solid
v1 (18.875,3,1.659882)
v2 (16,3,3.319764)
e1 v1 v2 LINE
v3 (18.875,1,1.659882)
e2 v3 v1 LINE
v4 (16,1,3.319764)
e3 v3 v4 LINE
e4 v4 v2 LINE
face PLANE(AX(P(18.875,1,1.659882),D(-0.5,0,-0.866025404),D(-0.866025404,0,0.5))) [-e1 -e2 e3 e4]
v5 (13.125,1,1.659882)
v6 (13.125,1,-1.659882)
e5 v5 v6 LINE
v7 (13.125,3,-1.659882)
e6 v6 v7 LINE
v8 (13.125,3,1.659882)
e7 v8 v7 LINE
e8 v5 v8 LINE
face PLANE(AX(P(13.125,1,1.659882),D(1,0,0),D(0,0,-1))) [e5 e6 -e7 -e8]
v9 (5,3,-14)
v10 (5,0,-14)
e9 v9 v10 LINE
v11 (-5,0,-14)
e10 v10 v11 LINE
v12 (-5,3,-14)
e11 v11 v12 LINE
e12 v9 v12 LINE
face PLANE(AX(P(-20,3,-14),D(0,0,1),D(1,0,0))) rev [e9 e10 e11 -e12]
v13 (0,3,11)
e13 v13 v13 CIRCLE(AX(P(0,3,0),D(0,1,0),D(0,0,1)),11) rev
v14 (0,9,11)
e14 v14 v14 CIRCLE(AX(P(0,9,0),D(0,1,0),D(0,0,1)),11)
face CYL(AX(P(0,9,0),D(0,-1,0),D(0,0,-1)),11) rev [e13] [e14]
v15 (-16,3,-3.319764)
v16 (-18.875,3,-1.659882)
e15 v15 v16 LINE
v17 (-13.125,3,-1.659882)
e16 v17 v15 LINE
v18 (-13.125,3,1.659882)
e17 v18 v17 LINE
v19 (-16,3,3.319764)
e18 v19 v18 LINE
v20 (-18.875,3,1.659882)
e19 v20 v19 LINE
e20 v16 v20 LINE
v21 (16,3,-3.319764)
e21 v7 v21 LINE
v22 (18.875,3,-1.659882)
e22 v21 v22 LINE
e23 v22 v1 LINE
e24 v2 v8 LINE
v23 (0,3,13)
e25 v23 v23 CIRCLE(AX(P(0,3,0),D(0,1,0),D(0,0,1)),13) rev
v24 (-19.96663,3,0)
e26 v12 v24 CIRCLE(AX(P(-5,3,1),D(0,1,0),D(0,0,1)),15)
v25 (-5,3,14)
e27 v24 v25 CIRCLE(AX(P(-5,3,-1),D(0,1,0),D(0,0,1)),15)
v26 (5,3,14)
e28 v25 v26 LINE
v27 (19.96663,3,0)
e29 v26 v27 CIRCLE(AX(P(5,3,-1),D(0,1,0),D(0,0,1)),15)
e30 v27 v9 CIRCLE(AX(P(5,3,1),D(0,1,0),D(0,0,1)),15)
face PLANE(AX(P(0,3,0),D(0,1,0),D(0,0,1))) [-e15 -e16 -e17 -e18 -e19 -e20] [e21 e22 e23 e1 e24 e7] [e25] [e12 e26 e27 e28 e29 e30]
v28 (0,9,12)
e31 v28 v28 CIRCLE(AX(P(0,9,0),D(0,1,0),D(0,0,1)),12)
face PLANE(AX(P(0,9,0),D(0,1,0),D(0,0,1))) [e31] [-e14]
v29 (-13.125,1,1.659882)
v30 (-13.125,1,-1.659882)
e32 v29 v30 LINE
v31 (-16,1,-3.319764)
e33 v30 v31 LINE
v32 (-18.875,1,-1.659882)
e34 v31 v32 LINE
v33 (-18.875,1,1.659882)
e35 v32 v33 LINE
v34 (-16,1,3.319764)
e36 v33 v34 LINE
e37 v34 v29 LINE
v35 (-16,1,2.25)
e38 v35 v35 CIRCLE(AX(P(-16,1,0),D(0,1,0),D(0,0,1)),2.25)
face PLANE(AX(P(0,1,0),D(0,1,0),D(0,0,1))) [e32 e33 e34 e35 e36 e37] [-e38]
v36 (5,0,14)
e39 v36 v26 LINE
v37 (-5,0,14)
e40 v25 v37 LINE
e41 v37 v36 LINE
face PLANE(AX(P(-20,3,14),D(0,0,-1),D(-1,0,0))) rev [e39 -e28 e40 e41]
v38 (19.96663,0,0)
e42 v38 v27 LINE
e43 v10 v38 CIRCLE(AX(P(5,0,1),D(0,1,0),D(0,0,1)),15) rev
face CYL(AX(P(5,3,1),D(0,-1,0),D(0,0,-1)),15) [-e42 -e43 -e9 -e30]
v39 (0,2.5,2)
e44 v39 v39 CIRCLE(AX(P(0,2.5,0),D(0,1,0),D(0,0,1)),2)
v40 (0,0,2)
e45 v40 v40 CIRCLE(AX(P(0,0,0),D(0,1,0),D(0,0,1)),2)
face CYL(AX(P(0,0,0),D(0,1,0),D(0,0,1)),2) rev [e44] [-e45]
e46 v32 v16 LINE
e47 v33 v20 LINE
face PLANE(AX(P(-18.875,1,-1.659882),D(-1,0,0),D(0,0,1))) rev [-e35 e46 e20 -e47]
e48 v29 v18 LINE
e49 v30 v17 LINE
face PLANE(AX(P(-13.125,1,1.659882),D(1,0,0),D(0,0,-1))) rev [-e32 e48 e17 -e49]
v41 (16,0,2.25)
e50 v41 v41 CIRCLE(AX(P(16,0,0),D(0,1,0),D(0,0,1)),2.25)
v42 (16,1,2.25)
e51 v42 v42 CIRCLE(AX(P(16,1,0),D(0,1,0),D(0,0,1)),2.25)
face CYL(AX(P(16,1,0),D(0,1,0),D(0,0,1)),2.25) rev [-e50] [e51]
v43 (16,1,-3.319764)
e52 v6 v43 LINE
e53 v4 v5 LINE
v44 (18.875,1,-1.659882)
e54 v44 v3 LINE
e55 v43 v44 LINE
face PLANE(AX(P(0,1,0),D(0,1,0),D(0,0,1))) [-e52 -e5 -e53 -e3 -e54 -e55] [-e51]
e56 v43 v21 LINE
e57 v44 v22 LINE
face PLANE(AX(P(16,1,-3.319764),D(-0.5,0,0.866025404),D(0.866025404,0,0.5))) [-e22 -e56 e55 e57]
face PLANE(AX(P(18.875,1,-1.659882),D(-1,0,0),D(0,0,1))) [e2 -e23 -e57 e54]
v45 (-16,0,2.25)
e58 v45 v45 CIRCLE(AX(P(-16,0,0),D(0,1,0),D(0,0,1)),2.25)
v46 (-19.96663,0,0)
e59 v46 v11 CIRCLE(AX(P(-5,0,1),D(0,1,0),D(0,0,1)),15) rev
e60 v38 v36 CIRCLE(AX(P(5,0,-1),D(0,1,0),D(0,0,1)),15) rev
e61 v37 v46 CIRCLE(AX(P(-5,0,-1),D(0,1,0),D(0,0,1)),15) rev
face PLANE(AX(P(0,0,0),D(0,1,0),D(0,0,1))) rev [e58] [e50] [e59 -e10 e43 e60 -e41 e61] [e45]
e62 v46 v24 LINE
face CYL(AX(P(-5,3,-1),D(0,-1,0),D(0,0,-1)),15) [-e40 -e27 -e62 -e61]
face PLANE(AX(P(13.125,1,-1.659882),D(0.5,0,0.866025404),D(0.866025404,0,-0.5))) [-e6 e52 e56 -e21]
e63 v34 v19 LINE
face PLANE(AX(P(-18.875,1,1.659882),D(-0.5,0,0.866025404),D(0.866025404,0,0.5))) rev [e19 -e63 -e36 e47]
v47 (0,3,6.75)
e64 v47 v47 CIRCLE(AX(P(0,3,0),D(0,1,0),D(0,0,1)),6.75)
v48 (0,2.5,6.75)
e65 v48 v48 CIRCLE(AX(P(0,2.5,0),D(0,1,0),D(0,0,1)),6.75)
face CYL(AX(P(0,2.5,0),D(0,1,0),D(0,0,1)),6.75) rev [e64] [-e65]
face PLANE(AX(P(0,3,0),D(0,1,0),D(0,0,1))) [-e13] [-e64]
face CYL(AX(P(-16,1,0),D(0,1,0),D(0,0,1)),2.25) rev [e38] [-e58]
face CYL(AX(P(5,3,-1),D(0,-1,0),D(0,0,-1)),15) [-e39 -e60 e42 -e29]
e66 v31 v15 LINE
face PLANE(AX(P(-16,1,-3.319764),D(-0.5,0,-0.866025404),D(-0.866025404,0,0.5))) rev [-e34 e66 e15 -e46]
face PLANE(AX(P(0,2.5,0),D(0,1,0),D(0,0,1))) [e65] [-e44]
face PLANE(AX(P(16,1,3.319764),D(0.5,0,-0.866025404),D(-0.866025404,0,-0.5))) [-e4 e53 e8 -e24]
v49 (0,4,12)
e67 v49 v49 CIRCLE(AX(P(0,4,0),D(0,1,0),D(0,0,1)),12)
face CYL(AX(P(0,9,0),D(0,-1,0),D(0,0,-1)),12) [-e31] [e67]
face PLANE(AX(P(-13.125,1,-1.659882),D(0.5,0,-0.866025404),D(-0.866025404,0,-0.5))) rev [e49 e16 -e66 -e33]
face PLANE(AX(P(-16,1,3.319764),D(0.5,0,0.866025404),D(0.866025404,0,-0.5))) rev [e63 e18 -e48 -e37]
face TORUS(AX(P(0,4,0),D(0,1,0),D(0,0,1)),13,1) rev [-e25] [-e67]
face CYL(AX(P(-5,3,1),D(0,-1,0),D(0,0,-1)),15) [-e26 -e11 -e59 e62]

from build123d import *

# Parameters (mm, degrees)
SKETCH2_W           = 40
SKETCH2_H           = 28
BOSS_EXTRUDE1_DEPTH = 3
SKETCH3_R           = 12
SKETCH3_R_2         = 11
BOSS_EXTRUDE2_DEPTH = 6
CUT_EXTRUDE1_DEPTH  = 2
FILLET1_R           = 1
FILLET2_R           = 15
SKETCH8_R           = 6.75
CUT_EXTRUDE2_DEPTH  = 0.5
SKETCH9_R           = 2
CUT_EXTRUDE3_DEPTH  = 26.237200627


with BuildPart() as part:
    # Sketch2 → Boss-Extrude1 (new body)
    with BuildSketch(Plane(origin=(0, 0, 0), x_dir=(1, 0, 0), z_dir=(0, 1, 0))):
        Rectangle(SKETCH2_W, SKETCH2_H)
    extrude(amount=BOSS_EXTRUDE1_DEPTH)

    # Sketch3 → Boss-Extrude2 (add)
    with BuildSketch(Plane(origin=(0, 3, 0), x_dir=(1, 0, 0), z_dir=(0, 1, 0))):
        with Locations(Location((0, 0, 0), (0, 0, 270))):
            Circle(SKETCH3_R)
        with Locations(Location((0, 0, 0), (0, 0, 270))):
            Circle(SKETCH3_R_2, mode=Mode.SUBTRACT)
    extrude(amount=BOSS_EXTRUDE2_DEPTH)

    # Sketch4 → Cut-Extrude1 (cut)
    with BuildSketch(Plane(origin=(0, 3, 0), x_dir=(1, 0, 0), z_dir=(0, 1, 0))):
        Polygon((-16, 3.319764048), (-18.875, 1.659882024), (-18.875, -1.659882024), (-16, -3.319764048), (-13.125, -1.659882024), (-13.125, 1.659882024), align=None)
    cut_extrude1 = extrude(amount=-CUT_EXTRUDE1_DEPTH, mode=Mode.SUBTRACT)

    # Sketch6 → M4 Clearance Hole1 (revolve, cut)
    with BuildSketch(Plane(origin=(-16, 1, 0), x_dir=(0, 0, 1), z_dir=(1, 0, 0))):
        Polygon((0, 0), (0, 3.351936393), (2.25, 2), (2.25, 0), align=None)
    m4_clearance_hole1 = revolve(axis=Axis((-16, 7.35, 0), (0, -1, 0)), mode=Mode.SUBTRACT)

    # Mirror1: Cut-Extrude1, M4 Clearance Hole1 across plane
    add(cut_extrude1.mirror(Plane(origin=(0, 0, 0), x_dir=(0, 0, 1), z_dir=(1, 0, 0))), mode=Mode.SUBTRACT)
    add(m4_clearance_hole1.mirror(Plane(origin=(0, 0, 0), x_dir=(0, 0, 1), z_dir=(1, 0, 0))), mode=Mode.SUBTRACT)

    # Fillet1
    fillet1_edges = [part.edges().sort_by_distance(p)[0] for p in [
        (0, 3, -12),
    ]]
    fillet(fillet1_edges, radius=FILLET1_R)

    # Fillet2
    # the kernel refuses this fillet: 15 mm, written as the material it takes off along each edge
    with BuildSketch(Plane(origin=(-20, -37.5, -14), x_dir=(1, 0, 0), z_dir=(0, 1, 0)), Plane(origin=(-20, -37.5, 14), x_dir=(0, 0, -1), z_dir=(0, 1, 0))) as fillet2_piece_1:
        with BuildLine():
            CenterArc((FILLET2_R, -FILLET2_R), FILLET2_R, 90, 90)
            Line((0, -FILLET2_R), (0, 0))
            Line((0, 0), (FILLET2_R, 0))
        make_face()
    extrude(amount=78, mode=Mode.SUBTRACT)
    with BuildSketch(Plane(origin=(20, -37.5, 14), x_dir=(0, 0, -1), z_dir=(0, 1, 0)), Plane(origin=(20, -37.5, -14), x_dir=(-1, 0, 0), z_dir=(0, 1, 0))) as fillet2_piece_2:
        with BuildLine():
            CenterArc((FILLET2_R, FILLET2_R), FILLET2_R, 180, 90)
            Line((0, FILLET2_R), (0, 0))
            Line((0, 0), (FILLET2_R, 0))
        make_face()
    extrude(amount=78, mode=Mode.SUBTRACT)

    # Sketch8 → Cut-Extrude2 (cut)
    with BuildSketch(Plane(origin=(0, 3, 0), x_dir=(1, 0, 0), z_dir=(0, 1, 0))):
        with Locations(Location((0, 0, 0), (0, 0, 270))):
            Circle(SKETCH8_R)
    extrude(amount=-CUT_EXTRUDE2_DEPTH, mode=Mode.SUBTRACT)

    # Sketch9 → Cut-Extrude3 (cut, through all)
    with BuildSketch(Plane(origin=(0, 2.5, 0), x_dir=(1, 0, 0), z_dir=(0, 1, 0))):
        with Locations(Location((0, 0, 0), (0, 0, 270))):
            Circle(SKETCH9_R)
    extrude(amount=-CUT_EXTRUDE3_DEPTH, mode=Mode.SUBTRACT)


solid = part.part
